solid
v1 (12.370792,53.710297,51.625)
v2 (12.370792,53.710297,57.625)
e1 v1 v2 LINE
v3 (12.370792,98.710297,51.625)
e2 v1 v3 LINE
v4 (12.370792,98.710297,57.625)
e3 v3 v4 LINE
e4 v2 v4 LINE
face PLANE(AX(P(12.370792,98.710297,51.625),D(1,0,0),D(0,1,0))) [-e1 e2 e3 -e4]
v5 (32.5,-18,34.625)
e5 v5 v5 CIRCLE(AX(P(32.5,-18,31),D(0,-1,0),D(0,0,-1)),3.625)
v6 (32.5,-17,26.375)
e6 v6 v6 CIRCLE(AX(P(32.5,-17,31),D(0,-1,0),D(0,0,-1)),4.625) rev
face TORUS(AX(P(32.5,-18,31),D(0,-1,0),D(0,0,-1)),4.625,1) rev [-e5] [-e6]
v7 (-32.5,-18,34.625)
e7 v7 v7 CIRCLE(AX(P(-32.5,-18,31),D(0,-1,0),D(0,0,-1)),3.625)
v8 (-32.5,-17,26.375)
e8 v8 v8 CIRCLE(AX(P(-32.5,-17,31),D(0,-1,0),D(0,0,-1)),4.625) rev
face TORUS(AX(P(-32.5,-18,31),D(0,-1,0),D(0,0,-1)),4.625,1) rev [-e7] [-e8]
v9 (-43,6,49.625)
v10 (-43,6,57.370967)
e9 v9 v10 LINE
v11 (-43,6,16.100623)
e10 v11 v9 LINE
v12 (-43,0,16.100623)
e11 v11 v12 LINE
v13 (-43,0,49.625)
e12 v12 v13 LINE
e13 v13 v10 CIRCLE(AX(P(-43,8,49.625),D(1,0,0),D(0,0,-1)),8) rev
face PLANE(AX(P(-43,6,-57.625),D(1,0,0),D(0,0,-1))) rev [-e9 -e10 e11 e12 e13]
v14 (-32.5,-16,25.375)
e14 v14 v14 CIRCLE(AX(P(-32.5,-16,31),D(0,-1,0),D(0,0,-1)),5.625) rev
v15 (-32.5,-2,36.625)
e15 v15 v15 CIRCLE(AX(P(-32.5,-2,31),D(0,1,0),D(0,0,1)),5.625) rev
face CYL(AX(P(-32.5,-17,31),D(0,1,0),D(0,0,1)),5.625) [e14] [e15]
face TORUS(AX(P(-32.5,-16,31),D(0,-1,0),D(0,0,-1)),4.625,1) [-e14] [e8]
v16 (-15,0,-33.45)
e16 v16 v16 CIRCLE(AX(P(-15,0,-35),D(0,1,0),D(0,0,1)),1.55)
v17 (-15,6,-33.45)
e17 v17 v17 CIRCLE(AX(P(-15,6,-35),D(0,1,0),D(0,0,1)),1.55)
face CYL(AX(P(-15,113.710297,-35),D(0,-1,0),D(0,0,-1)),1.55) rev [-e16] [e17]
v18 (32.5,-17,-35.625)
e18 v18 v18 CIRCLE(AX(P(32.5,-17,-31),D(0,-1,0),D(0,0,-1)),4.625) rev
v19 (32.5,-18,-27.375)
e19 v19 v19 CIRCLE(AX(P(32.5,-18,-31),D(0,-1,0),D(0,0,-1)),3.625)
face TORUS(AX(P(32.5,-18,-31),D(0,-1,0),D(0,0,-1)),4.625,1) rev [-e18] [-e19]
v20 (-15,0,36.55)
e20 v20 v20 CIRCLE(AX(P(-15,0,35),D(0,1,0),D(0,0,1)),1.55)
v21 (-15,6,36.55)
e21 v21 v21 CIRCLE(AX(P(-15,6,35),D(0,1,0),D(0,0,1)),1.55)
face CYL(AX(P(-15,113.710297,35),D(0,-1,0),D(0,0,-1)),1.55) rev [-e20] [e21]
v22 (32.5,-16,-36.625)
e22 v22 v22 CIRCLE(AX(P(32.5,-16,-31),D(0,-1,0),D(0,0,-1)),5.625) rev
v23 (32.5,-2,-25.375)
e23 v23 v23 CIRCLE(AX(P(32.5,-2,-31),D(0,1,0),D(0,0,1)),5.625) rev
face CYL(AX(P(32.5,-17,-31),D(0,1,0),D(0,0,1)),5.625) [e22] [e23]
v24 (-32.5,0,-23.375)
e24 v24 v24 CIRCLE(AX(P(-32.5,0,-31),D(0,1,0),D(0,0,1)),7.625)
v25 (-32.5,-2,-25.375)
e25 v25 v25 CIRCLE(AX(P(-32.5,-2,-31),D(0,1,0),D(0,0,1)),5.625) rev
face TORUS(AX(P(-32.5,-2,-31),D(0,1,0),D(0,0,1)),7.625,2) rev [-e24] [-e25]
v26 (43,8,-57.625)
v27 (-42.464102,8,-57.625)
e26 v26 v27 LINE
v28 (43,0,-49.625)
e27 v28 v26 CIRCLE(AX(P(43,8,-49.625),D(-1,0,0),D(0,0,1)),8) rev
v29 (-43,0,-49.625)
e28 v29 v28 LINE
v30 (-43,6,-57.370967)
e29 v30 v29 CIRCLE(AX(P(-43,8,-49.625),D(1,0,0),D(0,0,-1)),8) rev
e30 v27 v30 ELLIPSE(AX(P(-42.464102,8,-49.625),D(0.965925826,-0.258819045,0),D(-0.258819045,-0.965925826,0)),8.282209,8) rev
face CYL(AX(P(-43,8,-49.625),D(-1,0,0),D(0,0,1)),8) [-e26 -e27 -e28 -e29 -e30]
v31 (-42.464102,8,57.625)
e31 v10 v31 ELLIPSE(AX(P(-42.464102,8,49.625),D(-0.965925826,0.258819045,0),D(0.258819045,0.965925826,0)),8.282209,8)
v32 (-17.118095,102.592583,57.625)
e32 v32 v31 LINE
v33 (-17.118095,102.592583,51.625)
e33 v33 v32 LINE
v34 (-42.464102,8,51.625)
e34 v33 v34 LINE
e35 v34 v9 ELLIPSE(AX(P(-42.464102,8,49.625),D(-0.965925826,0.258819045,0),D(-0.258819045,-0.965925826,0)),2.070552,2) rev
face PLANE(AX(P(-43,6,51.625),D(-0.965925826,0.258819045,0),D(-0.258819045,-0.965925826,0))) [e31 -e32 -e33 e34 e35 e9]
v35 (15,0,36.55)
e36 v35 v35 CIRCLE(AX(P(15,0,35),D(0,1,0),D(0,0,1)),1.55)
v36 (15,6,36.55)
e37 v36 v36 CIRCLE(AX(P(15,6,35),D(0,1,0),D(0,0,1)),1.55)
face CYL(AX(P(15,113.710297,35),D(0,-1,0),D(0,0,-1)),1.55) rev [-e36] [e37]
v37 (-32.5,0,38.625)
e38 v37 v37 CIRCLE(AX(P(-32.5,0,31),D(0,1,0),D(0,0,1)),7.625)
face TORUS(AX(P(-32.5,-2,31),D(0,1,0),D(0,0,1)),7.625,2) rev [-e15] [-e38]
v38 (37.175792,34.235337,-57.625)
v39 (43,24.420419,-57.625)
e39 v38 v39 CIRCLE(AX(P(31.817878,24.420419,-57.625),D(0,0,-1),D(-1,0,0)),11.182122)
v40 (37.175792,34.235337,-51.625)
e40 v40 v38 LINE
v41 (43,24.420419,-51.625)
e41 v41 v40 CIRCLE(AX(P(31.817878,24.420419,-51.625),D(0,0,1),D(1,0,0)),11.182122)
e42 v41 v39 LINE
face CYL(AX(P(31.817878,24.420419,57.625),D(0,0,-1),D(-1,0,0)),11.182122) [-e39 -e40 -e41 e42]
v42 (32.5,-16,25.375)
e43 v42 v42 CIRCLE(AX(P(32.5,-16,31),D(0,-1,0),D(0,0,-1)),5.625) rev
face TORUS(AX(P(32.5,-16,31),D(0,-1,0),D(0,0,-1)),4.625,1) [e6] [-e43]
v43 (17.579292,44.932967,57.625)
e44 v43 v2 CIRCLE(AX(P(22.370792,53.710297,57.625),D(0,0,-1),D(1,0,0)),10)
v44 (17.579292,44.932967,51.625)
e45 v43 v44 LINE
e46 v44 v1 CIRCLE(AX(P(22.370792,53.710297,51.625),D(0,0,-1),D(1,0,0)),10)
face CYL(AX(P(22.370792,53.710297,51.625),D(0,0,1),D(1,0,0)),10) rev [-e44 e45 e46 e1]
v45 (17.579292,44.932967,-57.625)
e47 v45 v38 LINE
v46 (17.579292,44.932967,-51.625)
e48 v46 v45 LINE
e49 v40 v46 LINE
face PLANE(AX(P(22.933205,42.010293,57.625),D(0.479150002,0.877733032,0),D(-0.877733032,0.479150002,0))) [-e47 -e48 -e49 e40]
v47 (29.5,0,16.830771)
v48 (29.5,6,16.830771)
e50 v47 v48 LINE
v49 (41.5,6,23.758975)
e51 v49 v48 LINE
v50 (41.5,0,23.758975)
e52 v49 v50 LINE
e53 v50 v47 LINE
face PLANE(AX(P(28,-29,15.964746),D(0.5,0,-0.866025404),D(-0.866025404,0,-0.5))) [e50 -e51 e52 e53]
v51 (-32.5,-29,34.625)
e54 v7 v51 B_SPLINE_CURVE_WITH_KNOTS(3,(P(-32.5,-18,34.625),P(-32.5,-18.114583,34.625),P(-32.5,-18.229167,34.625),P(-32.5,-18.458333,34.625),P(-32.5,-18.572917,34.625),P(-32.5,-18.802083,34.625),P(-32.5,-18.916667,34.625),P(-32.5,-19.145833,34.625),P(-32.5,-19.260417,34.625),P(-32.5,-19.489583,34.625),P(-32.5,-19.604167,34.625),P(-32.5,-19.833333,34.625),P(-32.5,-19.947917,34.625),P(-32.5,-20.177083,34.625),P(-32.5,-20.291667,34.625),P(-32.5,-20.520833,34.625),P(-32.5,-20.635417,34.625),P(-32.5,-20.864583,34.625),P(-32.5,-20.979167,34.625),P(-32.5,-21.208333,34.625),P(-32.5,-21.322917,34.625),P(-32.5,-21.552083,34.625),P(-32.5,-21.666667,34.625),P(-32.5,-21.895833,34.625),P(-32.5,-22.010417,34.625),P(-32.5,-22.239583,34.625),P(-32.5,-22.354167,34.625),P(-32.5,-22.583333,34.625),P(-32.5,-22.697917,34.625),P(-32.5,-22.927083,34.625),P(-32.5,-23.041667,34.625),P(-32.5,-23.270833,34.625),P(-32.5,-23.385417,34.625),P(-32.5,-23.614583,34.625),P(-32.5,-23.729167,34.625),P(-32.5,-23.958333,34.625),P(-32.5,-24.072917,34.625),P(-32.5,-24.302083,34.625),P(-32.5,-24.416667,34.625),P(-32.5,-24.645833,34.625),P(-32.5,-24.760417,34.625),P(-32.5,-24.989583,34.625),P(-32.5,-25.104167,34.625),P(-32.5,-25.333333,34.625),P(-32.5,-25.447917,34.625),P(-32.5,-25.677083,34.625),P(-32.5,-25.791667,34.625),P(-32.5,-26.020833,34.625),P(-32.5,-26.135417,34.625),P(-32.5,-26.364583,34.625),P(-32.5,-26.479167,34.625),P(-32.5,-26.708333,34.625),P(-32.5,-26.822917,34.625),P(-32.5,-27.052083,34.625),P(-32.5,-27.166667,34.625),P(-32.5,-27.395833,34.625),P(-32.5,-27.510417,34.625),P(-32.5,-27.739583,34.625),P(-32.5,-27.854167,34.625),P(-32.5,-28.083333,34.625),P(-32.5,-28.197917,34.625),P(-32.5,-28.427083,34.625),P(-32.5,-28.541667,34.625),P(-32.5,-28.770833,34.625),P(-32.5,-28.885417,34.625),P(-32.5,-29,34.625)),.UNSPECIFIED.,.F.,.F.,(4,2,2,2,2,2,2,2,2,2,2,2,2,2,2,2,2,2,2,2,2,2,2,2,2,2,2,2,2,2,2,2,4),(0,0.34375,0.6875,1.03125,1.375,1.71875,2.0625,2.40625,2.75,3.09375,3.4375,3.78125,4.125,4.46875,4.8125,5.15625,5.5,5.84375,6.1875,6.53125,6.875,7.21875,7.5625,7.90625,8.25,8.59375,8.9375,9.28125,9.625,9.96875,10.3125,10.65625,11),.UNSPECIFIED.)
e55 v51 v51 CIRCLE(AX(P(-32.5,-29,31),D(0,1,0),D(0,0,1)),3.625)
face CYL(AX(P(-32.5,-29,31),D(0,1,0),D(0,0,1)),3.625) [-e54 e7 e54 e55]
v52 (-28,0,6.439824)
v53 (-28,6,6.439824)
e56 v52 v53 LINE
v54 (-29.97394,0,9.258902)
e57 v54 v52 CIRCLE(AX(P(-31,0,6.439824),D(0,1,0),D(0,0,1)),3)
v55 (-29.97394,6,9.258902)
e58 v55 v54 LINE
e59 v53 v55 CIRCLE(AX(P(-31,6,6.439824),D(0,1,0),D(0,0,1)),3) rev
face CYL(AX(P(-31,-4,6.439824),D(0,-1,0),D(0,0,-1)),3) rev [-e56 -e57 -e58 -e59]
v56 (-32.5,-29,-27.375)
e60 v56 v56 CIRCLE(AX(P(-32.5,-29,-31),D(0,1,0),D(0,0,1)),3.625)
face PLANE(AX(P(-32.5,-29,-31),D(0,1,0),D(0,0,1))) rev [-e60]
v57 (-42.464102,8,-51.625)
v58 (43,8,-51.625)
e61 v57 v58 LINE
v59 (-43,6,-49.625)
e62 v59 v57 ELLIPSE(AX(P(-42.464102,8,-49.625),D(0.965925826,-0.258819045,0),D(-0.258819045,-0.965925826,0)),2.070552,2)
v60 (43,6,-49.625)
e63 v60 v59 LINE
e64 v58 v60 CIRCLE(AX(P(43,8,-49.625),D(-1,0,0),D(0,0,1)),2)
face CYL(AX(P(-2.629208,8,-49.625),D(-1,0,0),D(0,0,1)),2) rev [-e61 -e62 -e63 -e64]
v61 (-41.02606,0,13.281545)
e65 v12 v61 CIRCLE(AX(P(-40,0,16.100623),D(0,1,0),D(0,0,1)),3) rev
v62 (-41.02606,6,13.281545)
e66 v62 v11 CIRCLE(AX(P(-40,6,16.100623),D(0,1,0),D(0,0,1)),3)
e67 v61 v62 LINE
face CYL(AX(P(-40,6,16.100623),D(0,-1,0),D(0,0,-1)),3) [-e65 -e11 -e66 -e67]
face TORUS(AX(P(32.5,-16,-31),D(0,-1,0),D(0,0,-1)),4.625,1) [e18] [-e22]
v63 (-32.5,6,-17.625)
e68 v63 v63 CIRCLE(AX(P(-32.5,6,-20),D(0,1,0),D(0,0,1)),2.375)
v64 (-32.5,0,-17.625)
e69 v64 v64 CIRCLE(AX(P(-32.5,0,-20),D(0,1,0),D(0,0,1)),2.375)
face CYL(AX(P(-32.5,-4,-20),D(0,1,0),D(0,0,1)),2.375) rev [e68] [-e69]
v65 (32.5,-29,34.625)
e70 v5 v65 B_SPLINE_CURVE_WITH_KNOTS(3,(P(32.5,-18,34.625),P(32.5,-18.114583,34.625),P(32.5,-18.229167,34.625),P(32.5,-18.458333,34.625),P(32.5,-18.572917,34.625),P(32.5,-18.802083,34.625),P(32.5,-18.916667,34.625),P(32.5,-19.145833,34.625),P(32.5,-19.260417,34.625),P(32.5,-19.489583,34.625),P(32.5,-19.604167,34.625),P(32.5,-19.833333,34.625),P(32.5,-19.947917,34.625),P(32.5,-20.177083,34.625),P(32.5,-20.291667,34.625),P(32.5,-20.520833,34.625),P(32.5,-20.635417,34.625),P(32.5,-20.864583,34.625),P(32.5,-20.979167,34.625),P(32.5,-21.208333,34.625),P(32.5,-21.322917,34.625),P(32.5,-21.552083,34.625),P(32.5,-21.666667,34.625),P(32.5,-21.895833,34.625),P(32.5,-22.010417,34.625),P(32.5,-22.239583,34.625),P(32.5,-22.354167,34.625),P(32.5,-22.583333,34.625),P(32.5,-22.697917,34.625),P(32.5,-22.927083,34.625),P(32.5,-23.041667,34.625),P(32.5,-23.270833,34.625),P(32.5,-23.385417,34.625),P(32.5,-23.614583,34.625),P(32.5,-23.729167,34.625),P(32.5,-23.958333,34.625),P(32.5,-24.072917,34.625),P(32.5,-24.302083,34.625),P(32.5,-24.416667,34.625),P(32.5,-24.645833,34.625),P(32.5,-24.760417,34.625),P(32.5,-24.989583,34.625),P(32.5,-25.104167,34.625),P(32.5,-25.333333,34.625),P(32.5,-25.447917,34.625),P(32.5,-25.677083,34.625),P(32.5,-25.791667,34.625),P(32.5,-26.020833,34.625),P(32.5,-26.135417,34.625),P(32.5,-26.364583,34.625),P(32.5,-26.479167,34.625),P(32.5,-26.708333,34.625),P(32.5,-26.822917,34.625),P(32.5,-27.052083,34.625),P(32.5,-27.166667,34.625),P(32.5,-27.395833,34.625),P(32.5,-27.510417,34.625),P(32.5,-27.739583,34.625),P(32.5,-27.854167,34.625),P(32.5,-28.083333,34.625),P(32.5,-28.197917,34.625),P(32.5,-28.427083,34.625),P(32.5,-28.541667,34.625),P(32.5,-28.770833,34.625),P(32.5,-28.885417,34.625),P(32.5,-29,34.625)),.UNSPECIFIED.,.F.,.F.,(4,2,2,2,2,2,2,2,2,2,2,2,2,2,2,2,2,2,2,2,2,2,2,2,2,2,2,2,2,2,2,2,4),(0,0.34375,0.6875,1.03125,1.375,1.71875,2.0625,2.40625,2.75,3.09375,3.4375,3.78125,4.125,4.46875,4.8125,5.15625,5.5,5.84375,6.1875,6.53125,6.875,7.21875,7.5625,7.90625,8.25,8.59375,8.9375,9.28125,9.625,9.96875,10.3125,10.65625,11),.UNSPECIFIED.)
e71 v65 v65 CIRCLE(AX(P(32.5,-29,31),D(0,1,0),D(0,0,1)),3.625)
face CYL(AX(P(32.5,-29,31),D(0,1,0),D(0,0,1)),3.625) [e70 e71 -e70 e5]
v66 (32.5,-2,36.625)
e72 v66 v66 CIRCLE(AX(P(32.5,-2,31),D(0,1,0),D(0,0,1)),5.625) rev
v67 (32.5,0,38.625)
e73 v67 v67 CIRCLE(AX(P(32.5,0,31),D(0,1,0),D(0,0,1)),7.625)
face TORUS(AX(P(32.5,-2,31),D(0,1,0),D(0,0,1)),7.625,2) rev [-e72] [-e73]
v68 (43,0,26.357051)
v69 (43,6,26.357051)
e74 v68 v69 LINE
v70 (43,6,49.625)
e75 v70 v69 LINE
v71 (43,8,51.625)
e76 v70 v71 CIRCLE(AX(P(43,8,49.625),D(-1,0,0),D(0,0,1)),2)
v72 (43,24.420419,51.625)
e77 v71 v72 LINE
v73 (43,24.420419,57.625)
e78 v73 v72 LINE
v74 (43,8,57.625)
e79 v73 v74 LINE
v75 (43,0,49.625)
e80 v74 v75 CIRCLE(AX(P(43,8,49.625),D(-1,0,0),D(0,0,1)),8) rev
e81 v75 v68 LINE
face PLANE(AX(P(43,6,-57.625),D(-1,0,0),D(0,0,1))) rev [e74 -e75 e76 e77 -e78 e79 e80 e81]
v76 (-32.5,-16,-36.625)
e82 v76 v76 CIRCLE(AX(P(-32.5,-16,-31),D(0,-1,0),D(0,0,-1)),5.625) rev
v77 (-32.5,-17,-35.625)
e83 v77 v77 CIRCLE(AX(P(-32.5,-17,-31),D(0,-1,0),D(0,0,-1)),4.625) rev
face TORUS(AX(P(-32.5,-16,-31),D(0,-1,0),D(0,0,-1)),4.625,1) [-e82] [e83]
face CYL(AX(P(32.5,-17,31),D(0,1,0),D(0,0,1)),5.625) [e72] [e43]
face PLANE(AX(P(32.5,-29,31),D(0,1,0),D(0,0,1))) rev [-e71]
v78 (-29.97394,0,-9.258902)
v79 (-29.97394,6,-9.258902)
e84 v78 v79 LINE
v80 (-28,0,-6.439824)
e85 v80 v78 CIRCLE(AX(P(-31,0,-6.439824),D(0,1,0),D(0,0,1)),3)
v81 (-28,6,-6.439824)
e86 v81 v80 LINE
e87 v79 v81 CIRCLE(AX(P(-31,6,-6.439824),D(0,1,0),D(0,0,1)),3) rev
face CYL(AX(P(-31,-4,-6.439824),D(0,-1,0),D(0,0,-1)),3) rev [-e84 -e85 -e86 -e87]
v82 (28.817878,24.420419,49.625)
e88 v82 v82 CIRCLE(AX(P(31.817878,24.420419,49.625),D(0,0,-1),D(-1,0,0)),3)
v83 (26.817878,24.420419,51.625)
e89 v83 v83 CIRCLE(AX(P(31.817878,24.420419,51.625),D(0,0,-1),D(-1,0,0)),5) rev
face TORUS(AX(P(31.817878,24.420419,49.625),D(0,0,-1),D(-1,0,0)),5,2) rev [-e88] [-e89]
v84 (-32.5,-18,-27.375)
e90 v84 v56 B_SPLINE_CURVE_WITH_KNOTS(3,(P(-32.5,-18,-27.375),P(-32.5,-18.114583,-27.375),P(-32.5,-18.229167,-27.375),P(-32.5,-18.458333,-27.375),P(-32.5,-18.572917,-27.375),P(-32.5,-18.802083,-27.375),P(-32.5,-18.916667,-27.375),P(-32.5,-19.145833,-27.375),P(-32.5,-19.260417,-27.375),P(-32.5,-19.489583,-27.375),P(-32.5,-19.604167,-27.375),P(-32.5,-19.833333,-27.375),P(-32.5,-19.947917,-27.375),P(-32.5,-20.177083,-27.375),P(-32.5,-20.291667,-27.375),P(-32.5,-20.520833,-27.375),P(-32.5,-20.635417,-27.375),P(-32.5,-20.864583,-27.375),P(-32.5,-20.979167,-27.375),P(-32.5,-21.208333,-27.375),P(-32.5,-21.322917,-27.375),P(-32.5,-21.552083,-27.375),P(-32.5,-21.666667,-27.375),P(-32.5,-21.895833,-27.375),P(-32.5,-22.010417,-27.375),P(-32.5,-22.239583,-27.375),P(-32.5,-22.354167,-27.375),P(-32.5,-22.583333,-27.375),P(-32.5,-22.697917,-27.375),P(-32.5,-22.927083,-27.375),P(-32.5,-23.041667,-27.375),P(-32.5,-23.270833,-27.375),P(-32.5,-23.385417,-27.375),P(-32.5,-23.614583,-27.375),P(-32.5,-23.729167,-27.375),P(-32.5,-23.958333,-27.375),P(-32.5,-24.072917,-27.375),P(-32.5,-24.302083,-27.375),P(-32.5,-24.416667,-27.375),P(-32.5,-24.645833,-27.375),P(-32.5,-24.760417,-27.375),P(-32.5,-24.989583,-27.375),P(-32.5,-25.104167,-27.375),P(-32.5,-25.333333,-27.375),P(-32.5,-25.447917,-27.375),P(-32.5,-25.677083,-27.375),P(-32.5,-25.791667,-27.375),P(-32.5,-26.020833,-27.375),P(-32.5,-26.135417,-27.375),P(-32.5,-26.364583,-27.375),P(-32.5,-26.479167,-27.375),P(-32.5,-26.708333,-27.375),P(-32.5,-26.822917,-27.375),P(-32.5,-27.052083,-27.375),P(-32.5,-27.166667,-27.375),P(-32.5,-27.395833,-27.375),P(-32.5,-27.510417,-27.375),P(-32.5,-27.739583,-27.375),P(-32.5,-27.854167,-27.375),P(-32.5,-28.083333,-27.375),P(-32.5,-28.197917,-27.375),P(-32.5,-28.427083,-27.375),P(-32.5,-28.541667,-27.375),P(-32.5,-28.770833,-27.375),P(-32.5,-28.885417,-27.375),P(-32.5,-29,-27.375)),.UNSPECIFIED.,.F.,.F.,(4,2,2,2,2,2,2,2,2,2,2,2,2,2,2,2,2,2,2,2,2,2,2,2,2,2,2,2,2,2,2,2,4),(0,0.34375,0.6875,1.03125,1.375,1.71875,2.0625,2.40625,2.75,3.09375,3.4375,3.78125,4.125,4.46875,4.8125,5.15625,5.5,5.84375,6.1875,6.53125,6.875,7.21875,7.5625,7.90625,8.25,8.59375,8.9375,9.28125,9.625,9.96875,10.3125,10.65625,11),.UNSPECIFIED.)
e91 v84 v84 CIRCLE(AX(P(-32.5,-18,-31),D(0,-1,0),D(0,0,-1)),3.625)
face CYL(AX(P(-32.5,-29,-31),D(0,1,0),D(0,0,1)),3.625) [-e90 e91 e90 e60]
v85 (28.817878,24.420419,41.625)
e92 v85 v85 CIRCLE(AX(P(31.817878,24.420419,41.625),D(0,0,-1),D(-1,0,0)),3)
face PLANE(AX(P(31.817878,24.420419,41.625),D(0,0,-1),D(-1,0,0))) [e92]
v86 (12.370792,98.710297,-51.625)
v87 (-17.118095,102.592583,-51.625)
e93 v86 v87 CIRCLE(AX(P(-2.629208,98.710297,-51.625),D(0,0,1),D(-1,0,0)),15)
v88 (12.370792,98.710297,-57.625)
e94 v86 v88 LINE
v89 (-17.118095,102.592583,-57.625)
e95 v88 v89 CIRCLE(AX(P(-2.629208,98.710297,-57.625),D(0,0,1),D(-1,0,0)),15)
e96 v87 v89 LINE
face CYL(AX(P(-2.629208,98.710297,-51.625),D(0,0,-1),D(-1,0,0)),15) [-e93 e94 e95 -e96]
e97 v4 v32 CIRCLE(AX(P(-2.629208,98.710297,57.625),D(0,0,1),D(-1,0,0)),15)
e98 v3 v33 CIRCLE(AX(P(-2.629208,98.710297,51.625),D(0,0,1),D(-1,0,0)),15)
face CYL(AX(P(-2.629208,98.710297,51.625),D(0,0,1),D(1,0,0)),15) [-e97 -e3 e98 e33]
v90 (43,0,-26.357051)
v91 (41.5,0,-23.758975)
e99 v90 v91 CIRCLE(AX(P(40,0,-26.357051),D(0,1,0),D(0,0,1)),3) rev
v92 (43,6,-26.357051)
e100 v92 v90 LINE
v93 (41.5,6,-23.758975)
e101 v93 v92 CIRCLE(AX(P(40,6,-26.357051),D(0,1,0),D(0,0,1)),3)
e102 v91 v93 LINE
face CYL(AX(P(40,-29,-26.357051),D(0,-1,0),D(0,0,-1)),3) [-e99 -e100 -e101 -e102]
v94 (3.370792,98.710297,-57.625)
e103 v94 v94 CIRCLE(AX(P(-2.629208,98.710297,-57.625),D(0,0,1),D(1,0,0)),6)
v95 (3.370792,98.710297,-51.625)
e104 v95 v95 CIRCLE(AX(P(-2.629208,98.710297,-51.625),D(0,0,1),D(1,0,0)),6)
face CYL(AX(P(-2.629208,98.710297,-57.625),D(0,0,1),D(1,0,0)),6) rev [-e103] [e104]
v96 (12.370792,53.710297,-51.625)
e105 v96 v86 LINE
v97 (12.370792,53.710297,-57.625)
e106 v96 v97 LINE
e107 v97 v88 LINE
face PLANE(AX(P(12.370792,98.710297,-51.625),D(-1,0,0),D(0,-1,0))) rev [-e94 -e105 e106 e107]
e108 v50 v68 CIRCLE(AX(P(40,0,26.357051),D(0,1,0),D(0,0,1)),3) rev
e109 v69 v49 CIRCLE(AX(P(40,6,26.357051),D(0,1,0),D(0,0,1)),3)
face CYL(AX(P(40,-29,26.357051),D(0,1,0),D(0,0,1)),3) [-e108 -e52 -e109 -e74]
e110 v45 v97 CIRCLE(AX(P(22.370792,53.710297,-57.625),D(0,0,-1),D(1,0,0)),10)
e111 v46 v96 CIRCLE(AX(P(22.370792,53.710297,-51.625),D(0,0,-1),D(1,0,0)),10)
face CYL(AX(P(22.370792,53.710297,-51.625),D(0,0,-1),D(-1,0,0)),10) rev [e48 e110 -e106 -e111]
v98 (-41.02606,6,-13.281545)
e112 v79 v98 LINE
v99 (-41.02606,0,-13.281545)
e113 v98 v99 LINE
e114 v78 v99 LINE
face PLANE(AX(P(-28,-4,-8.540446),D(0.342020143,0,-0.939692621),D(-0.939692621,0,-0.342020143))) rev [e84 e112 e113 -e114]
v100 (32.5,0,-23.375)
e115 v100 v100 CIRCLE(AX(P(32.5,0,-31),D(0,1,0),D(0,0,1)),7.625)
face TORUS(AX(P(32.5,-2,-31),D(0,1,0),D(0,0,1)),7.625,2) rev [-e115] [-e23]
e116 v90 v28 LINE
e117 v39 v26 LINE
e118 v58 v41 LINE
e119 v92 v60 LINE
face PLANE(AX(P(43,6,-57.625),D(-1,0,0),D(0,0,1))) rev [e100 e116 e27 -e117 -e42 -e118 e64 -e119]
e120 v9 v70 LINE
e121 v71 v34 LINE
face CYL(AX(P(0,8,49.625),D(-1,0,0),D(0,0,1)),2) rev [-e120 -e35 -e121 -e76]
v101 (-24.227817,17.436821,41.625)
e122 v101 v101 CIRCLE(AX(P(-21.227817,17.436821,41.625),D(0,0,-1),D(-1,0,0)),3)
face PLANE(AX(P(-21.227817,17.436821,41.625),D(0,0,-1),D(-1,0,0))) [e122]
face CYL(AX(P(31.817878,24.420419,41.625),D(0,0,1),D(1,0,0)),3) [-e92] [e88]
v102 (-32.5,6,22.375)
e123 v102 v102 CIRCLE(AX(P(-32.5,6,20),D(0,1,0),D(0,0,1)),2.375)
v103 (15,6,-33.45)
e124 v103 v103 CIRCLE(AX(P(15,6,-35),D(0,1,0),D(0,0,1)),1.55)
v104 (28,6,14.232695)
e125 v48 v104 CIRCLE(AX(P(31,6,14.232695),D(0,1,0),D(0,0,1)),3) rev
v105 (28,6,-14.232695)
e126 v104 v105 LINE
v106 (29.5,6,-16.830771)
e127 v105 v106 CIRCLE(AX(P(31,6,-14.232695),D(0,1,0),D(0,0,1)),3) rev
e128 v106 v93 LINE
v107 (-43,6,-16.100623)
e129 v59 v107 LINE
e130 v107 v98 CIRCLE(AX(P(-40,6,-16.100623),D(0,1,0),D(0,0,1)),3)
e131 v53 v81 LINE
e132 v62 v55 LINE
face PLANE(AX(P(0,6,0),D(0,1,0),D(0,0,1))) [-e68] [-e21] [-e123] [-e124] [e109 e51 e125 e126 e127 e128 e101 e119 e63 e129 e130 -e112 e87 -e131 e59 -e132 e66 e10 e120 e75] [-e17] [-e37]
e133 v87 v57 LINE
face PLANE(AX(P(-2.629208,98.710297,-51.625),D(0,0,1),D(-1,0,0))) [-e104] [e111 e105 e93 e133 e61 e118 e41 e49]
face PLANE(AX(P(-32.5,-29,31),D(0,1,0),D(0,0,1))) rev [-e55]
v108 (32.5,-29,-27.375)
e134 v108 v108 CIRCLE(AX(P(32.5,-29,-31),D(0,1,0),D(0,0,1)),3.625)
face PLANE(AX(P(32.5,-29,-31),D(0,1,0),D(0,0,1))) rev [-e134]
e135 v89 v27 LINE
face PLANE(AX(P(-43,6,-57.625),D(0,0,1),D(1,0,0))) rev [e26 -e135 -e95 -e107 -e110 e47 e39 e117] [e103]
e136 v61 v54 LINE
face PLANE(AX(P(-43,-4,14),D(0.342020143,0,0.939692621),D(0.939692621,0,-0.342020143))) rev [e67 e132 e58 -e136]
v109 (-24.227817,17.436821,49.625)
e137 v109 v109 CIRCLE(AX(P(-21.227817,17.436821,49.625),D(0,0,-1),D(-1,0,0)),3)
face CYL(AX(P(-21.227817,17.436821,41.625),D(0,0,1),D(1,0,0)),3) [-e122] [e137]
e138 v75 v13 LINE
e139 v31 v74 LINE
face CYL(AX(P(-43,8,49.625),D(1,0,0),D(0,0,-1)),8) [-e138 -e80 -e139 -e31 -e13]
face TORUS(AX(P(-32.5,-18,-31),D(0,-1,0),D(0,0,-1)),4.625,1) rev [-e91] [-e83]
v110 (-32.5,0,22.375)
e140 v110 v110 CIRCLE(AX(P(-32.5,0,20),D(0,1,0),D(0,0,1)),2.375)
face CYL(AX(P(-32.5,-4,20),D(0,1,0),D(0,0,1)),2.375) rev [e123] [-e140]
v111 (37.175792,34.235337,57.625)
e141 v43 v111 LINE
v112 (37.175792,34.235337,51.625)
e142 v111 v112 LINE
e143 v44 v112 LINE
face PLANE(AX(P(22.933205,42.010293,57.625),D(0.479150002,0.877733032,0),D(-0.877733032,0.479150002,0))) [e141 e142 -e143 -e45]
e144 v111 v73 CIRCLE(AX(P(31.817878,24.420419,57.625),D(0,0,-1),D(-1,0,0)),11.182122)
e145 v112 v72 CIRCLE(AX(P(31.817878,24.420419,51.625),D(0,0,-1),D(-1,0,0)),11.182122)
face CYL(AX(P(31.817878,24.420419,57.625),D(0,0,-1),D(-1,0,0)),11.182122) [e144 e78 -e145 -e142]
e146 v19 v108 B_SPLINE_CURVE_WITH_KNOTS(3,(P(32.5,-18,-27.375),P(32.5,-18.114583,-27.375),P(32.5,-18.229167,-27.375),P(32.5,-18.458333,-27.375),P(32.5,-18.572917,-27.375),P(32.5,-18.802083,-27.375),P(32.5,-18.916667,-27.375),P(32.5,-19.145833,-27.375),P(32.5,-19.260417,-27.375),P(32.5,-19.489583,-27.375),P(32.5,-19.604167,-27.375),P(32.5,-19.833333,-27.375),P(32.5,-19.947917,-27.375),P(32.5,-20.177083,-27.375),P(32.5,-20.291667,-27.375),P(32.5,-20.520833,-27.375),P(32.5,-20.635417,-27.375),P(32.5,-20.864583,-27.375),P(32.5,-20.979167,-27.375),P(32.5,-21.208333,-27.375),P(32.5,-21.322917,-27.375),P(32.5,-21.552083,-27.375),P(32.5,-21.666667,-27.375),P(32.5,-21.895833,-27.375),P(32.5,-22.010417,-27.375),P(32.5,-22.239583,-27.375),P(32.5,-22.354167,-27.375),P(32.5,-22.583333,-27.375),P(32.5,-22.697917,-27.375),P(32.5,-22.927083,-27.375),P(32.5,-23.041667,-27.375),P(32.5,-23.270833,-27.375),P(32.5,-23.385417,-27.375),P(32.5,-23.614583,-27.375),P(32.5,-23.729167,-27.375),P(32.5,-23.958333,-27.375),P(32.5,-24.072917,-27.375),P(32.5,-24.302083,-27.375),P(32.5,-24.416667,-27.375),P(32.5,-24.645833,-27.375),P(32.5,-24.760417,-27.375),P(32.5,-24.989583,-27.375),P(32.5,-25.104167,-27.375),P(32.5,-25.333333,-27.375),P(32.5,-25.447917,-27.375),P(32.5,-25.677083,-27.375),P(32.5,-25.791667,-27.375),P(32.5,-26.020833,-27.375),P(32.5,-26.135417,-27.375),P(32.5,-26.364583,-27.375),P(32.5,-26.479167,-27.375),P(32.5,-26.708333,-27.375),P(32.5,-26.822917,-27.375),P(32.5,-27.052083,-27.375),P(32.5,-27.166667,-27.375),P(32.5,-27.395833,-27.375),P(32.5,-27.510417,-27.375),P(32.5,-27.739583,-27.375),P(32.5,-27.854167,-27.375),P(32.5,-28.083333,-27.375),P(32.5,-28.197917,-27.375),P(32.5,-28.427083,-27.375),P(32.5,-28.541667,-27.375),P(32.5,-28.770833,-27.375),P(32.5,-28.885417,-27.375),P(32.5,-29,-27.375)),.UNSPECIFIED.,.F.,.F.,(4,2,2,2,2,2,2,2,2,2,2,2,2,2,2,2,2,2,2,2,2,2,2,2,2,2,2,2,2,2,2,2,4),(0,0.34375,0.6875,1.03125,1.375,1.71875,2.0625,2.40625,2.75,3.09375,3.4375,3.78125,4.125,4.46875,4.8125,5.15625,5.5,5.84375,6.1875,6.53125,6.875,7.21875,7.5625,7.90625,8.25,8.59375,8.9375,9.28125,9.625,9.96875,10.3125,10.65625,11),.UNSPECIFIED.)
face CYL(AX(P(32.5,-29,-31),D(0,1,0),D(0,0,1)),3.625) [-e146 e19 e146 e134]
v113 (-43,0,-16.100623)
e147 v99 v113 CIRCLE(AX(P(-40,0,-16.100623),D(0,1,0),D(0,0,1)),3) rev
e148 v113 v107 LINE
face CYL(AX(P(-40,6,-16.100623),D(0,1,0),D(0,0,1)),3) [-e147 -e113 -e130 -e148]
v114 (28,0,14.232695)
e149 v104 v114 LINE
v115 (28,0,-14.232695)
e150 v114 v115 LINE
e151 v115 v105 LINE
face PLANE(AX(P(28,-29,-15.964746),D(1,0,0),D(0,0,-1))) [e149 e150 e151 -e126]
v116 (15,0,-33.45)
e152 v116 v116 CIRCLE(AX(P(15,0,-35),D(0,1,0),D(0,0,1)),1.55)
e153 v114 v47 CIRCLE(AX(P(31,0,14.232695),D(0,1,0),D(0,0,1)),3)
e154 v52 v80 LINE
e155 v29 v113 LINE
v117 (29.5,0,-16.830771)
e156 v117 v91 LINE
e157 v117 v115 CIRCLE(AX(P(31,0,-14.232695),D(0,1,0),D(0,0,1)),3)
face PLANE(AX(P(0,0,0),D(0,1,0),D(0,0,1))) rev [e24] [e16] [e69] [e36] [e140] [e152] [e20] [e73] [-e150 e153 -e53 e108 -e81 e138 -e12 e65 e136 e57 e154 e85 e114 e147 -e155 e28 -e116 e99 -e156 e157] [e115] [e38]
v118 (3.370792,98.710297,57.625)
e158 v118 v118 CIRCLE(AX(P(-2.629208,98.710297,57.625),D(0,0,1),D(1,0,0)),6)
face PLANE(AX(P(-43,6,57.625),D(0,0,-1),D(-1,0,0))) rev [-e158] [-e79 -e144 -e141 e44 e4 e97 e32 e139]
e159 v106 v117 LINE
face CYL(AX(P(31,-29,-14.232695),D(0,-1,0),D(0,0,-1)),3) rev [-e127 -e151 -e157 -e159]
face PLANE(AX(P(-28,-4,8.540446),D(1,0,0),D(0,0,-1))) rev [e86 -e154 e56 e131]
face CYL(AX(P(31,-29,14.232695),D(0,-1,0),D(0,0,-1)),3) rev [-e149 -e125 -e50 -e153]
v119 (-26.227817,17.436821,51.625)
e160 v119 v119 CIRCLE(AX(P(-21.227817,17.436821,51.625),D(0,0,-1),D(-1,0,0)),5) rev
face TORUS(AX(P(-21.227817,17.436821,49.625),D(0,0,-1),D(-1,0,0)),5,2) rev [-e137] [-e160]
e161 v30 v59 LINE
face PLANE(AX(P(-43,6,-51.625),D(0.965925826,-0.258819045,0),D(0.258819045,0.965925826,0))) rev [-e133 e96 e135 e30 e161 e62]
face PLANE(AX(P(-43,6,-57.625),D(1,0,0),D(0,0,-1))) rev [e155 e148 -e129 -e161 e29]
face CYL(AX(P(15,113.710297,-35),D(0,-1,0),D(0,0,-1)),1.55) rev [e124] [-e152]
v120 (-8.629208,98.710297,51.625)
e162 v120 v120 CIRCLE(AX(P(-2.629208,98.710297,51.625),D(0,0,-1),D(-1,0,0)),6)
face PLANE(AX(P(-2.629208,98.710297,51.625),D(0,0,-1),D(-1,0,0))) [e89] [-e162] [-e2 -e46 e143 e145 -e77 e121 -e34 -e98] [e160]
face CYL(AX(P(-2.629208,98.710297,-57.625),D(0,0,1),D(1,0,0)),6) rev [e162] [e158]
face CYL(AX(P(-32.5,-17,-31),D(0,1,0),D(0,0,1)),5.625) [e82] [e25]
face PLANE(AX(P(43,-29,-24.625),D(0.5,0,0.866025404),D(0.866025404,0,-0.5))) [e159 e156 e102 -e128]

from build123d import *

# Parameters (mm, degrees)
SKETCH1_R               = 3.625
BOSS_EXTRUDE1_DEPTH     = 29
BOSS_EXTRUDE1_2_DEPTH   = 29
BOSS_EXTRUDE1_3_DEPTH   = 29
BOSS_EXTRUDE1_4_DEPTH   = 29
SKETCH2_W               = 86
SKETCH2_H               = 115.25
BOSS_EXTRUDE2_DEPTH     = 6
BOSS_EXTRUDE3_DEPTH     = 6
FILLET2_R               = 10
FILLET2_OF_MIRROR1_R    = 10
SKETCH5_R               = 5.625
SKETCH5_R_2             = 3.625
BOSS_EXTRUDE4_DEPTH     = 17
FILLET3_R               = 2
FILLET4_R               = 1
FILLET5_R               = 8
FILLET6_R               = 2
CUT_EXTRUDE1_DEPTH      = 130.503469817
FILLET7_R               = 3
CUT_EXTRUDE2_DEPTH      = 168.515951876
CUT_EXTRUDE2_DEPTH_BACK = 168.515951876
SKETCH7_R               = 6
SKETCH9_R               = 3
BOSS_EXTRUDE6_DEPTH     = 10
SKETCH8_R               = 3
BOSS_EXTRUDE7_DEPTH     = 10
FILLET8_R               = 2
CUT_EXTRUDE3_DEPTH      = 135.535022422
CUT_EXTRUDE3_DEPTH_BACK = 135.535022422
SKETCH12_R              = 1.55
BOSS_EXTRUDE8_DEPTH     = 6
CUT_EXTRUDE4_DEPTH      = 10
FILLET9_R               = 3
SKETCH15_R              = 2.375
CUT_EXTRUDE5_DEPTH      = 10
CUT_EXTRUDE6_DEPTH      = 164.445997605
CUT_EXTRUDE6_DEPTH_BACK = 164.445997605


with BuildPart() as part:
    # Sketch1 → Boss-Extrude1 (new body)
    with BuildSketch(Plane(origin=(0, 0, 0), x_dir=(1, 0, 0), z_dir=(0, 1, 0))):
        with Locations(Location((-32.5, 31, 0), (0, 0, 270))):
            Circle(SKETCH1_R)
    extrude(amount=-BOSS_EXTRUDE1_DEPTH)



with BuildPart() as body_2:
    # Sketch1 → Boss-Extrude1 2 (new body)
    with BuildSketch(Plane(origin=(0, 0, 0), x_dir=(1, 0, 0), z_dir=(0, 1, 0))):
        with Locations(Location((-32.5, -31, 0), (0, 0, 270))):
            Circle(SKETCH1_R)
    extrude(amount=-BOSS_EXTRUDE1_2_DEPTH)


with BuildPart() as body_3:
    # Sketch1 → Boss-Extrude1 3 (new body)
    with BuildSketch(Plane(origin=(0, 0, 0), x_dir=(1, 0, 0), z_dir=(0, 1, 0))):
        with Locations(Location((32.5, -31, 0), (0, 0, 270))):
            Circle(SKETCH1_R)
    extrude(amount=-BOSS_EXTRUDE1_3_DEPTH)


with BuildPart() as body_4:
    # Sketch1 → Boss-Extrude1 4 (new body)
    with BuildSketch(Plane(origin=(0, 0, 0), x_dir=(1, 0, 0), z_dir=(0, 1, 0))):
        with Locations(Location((32.5, 31, 0), (0, 0, 270))):
            Circle(SKETCH1_R)
    extrude(amount=-BOSS_EXTRUDE1_4_DEPTH)


with BuildPart() as part_1:
    add(part.part)

    add(body_2.part)  # Boss-Extrude2 merges body 2

    add(body_3.part)  # Boss-Extrude2 merges body 3

    add(body_4.part)  # Boss-Extrude2 merges body 4
    # Sketch2 → Boss-Extrude2 (add)
    with BuildSketch(Plane(origin=(0, 0, 0), x_dir=(1, 0, 0), z_dir=(0, 1, 0))):
        Rectangle(SKETCH2_W, SKETCH2_H)
    extrude(amount=BOSS_EXTRUDE2_DEPTH)

    # Sketch4 → Boss-Extrude3 (add)
    with BuildSketch(Plane.XY.offset(57.625)):
        with BuildLine():
            Line((43, 6), (-43, 6))
            Line((-43, 6), (-17.11809549, 102.592582629))
            ThreePointArc((-17.11809549, 102.592582629), (-0.671315212, 113.581969873), (12.370791905, 98.710296952))
            Line((12.370791905, 98.710296952), (12.370791905, 53.710296952))
            ThreePointArc((12.370791905, 53.710296952), (15.299724093, 46.639229141), (22.370791905, 43.710296952))
            Line((22.370791905, 43.710296952), (43, 43.710296952))
            Line((43, 43.710296952), (43, 6))
        make_face()
    boss_extrude3 = extrude(amount=-BOSS_EXTRUDE3_DEPTH)

    # Fillet2
    fillet2_edges = [part_1.edges().sort_by_distance(p)[0] for p in [
        (43, 43.710296952, 54.625),
    ]]
    fillet(fillet2_edges, radius=FILLET2_R)

    # Mirror1: Boss-Extrude3 across plane
    add(boss_extrude3.mirror(Plane.XY))

    # Fillet2 of Mirror1
    fillet2_of_mirror1_edges = [part_1.edges().sort_by_distance(p)[0] for p in [
        (43, 43.710296952, -54.625),
    ]]
    fillet(fillet2_of_mirror1_edges, radius=FILLET2_OF_MIRROR1_R)

    # Sketch5 → Boss-Extrude4 (add)
    # profile 1 of 4: a face of its own
    with BuildSketch(Plane.XZ):
        with Locations(Location((-32.5, 31, 0), (0, 0, 90))):
            Circle(SKETCH5_R)
        with Locations(Location((-32.5, 31, 0), (0, 0, 90))):
            Circle(SKETCH5_R_2, mode=Mode.SUBTRACT)
    # profile 2 of 4: a face of its own
    with BuildSketch(Plane.XZ):
        with Locations(Location((32.5, 31, 0), (0, 0, 90))):
            Circle(SKETCH5_R)
        with Locations(Location((32.5, 31, 0), (0, 0, 90))):
            Circle(SKETCH5_R_2, mode=Mode.SUBTRACT)
    # profile 3 of 4: a face of its own
    with BuildSketch(Plane.XZ):
        with Locations(Location((32.5, -31, 0), (0, 0, 90))):
            Circle(SKETCH5_R)
        with Locations(Location((32.5, -31, 0), (0, 0, 90))):
            Circle(SKETCH5_R_2, mode=Mode.SUBTRACT)
    # profile 4 of 4: a face of its own
    with BuildSketch(Plane.XZ):
        with Locations(Location((-32.5, -31, 0), (0, 0, 90))):
            Circle(SKETCH5_R)
        with Locations(Location((-32.5, -31, 0), (0, 0, 90))):
            Circle(SKETCH5_R_2, mode=Mode.SUBTRACT)
    extrude(amount=BOSS_EXTRUDE4_DEPTH)

    # Fillet3
    fillet3_edges = [part_1.edges().sort_by_distance(p)[0] for p in [
        (-32.5, 0, 25.375),
        (32.5, 0, 25.375),
        (32.5, 0, -36.625),
        (-32.5, 0, -36.625),
    ]]
    fillet(fillet3_edges, radius=FILLET3_R)

    # Fillet4
    fillet4_edges = [part_1.edges().sort_by_distance(p)[0] for p in [
        (-32.5, -17, 27.375),
        (-32.5, -17, 25.375),
        (32.5, -17, 27.375),
        (32.5, -17, 25.375),
        (32.5, -17, -34.625),
        (32.5, -17, -36.625),
        (-32.5, -17, -34.625),
        (-32.5, -17, -36.625),
    ]]
    fillet(fillet4_edges, radius=FILLET4_R - 0.0001)  # a hair under: the kernel refuses the full size

    # Fillet5
    fillet5_edges = [part_1.edges().sort_by_distance(p)[0] for p in [
        (0, 0, -57.625),
        (0, 0, 57.625),
    ]]
    fillet(fillet5_edges, radius=FILLET5_R)

    # Fillet6
    fillet6_edges = [part_1.edges().sort_by_distance(p)[0] for p in [
        (0, 6, 51.625),
        (0, 6, -51.625),
    ]]
    fillet(fillet6_edges, radius=FILLET6_R)

    # Sketch6 → Cut-Extrude1 (cut, symmetric)
    with BuildSketch(Plane(origin=(0, 6, 0), x_dir=(1, 0, 0), z_dir=(0, 1, 0))):
        Polygon((-43, 24.625), (-28, 15.964745962), (-28, -15.964745962), (-43, -24.625), align=None)
    cut_extrude1 = extrude(amount=CUT_EXTRUDE1_DEPTH, both=True, mode=Mode.SUBTRACT)

    # Mirror2: Cut-Extrude1 across plane
    add(cut_extrude1.mirror(Plane(origin=(0, 0, 0), x_dir=(0, 0, 1), z_dir=(1, 0, 0))), mode=Mode.SUBTRACT)

    # Fillet7
    fillet7_edges = [part_1.edges().sort_by_distance(p)[0] for p in [
        (-43, 3, 24.625),
        (-43, 3, -24.625),
        (-28, 3, -15.964745962),
        (-28, 3, 15.964745962),
        (43, 3, -24.625),
        (43, 3, 24.625),
        (28, 3, 15.964745962),
        (28, 3, -15.964745962),
    ]]
    fillet(fillet7_edges, radius=FILLET7_R)

    # Sketch7 → Cut-Extrude2 (cut, two sides: drawn at the far end of the back side and taken through both)
    with BuildSketch(Plane.XY.offset(57.625).offset(-CUT_EXTRUDE2_DEPTH_BACK)):
        with Locations((-2.629208095, 98.710296952)):
            Circle(SKETCH7_R)
    extrude(amount=CUT_EXTRUDE2_DEPTH + CUT_EXTRUDE2_DEPTH_BACK, mode=Mode.SUBTRACT)

    # Sketch9 → Boss-Extrude6 (add)
    with BuildSketch(Plane(origin=(0, 0, 51.625), x_dir=(-1, 0, 0), z_dir=(0, 0, -1))):
        with Locations((21.2278168, 17.436820688)):
            Circle(SKETCH9_R)
    extrude(amount=BOSS_EXTRUDE6_DEPTH)

    # Sketch8 → Boss-Extrude7 (add)
    with BuildSketch(Plane(origin=(0, 0, 51.625), x_dir=(-1, 0, 0), z_dir=(0, 0, -1))):
        with Locations((-31.817877634, 24.420418847)):
            Circle(SKETCH8_R)
    extrude(amount=BOSS_EXTRUDE7_DEPTH)

    # Fillet8
    fillet8_edges = [part_1.edges().sort_by_distance(p)[0] for p in [
        (-18.2278168, 17.436820688, 51.625),
        (34.817877634, 24.420418847, 51.625),
    ]]
    fillet(fillet8_edges, radius=FILLET8_R)

    # Sketch12 → Cut-Extrude3 (cut, two sides: drawn at the far end of the back side and taken through both)
    with BuildSketch(Plane.XZ.offset(-CUT_EXTRUDE3_DEPTH_BACK)):
        with Locations(Location((-15, 35, 0), (0, 0, 90))):
            Circle(SKETCH12_R)
        with Locations(Location((15, 35, 0), (0, 0, 90))):
            Circle(SKETCH12_R)
        with Locations(Location((15, -35, 0), (0, 0, 90))):
            Circle(SKETCH12_R)
        with Locations(Location((-15, -35, 0), (0, 0, 90))):
            Circle(SKETCH12_R)
    extrude(amount=CUT_EXTRUDE3_DEPTH + CUT_EXTRUDE3_DEPTH_BACK, mode=Mode.SUBTRACT)

    # Sketch13 → Boss-Extrude8 (add)
    with BuildSketch(Plane(origin=(0, 6, 0), x_dir=(1, 0, 0), z_dir=(0, 1, 0))):
        with BuildLine():
            Line((-41.5, -23.758974596), (-29.5, -16.830771366))
            ThreePointArc((-29.5, -16.830771366), (-28.401923789, -15.732695155), (-28, -14.232695155))
            Line((-28, -14.232695155), (-28, 14.232695155))
            ThreePointArc((-28, 14.232695155), (-28.401923789, 15.732695155), (-29.5, 16.830771366))
            Line((-29.5, 16.830771366), (-41.5, 23.758974596))
            ThreePointArc((-41.5, 23.758974596), (-42.598076211, 24.857050808), (-43, 26.357050808))
            Line((-43, 26.357050808), (-43, -26.357050808))
            ThreePointArc((-43, -26.357050808), (-42.598076211, -24.857050808), (-41.5, -23.758974596))
        make_face()
    extrude(amount=-BOSS_EXTRUDE8_DEPTH)

    # Sketch14 → Cut-Extrude4 (cut)
    with BuildSketch(Plane(origin=(0, 6, 0), x_dir=(1, 0, 0), z_dir=(0, 1, 0))):
        Polygon((-43, 14), (-43, -14), (-28, -8.540446486), (-28, 8.540446486), align=None)
    extrude(amount=-CUT_EXTRUDE4_DEPTH, mode=Mode.SUBTRACT)

    # Fillet9
    fillet9_edges = [part_1.edges().sort_by_distance(p)[0] for p in [
        (-43, 3, 14),
        (-43, 3, -14),
        (-28, 3, -8.540446486),
        (-28, 3, 8.540446486),
    ]]
    fillet(fillet9_edges, radius=FILLET9_R)

    # Sketch15 → Cut-Extrude5 (cut)
    with BuildSketch(Plane(origin=(0, 6, 0), x_dir=(1, 0, 0), z_dir=(0, 1, 0))):
        with Locations(Location((-32.5, 20, 0), (0, 0, 270))):
            Circle(SKETCH15_R)
        with Locations(Location((-32.5, -20, 0), (0, 0, 270))):
            Circle(SKETCH15_R)
    extrude(amount=-CUT_EXTRUDE5_DEPTH, mode=Mode.SUBTRACT)

    # Sketch16 → Cut-Extrude6 (cut, two sides: drawn at the far end of the back side and taken through both)
    with BuildSketch(Plane(origin=(0, 0, 51.625), x_dir=(-1, 0, 0), z_dir=(0, 0, -1)).offset(-CUT_EXTRUDE6_DEPTH_BACK)):
        with BuildLine():
            Line((-47.739415262, 24.420418847), (-43, 24.420418847))
            Line((-43, 24.420418847), (-43, 33.710296952))
            ThreePointArc((-43, 33.710296952), (-40.071067812, 40.781364764), (-33, 43.710296952))
            Line((-33, 43.710296952), (-47.739415262, 43.710296952))
            Line((-47.739415262, 43.710296952), (-47.739415262, 24.420418847))
        make_face()
        with BuildLine():
            Line((-37.175791591, 34.235337015), (-17.579291882, 44.932966633))
            ThreePointArc((-17.579291882, 44.932966633), (-19.898273269, 44.020784498), (-22.370791905, 43.710296952))
            Line((-22.370791905, 43.710296952), (-33, 43.710296952))
            ThreePointArc((-33, 43.710296952), (-40.071067812, 40.781364764), (-43, 33.710296952))
            Line((-43, 33.710296952), (-43, 24.420418847))
            ThreePointArc((-43, 24.420418847), (-41.434340344, 30.12686306), (-37.175791591, 34.235337015))
        make_face()
    extrude(amount=CUT_EXTRUDE6_DEPTH + CUT_EXTRUDE6_DEPTH_BACK, mode=Mode.SUBTRACT)


solid = part_1.part
